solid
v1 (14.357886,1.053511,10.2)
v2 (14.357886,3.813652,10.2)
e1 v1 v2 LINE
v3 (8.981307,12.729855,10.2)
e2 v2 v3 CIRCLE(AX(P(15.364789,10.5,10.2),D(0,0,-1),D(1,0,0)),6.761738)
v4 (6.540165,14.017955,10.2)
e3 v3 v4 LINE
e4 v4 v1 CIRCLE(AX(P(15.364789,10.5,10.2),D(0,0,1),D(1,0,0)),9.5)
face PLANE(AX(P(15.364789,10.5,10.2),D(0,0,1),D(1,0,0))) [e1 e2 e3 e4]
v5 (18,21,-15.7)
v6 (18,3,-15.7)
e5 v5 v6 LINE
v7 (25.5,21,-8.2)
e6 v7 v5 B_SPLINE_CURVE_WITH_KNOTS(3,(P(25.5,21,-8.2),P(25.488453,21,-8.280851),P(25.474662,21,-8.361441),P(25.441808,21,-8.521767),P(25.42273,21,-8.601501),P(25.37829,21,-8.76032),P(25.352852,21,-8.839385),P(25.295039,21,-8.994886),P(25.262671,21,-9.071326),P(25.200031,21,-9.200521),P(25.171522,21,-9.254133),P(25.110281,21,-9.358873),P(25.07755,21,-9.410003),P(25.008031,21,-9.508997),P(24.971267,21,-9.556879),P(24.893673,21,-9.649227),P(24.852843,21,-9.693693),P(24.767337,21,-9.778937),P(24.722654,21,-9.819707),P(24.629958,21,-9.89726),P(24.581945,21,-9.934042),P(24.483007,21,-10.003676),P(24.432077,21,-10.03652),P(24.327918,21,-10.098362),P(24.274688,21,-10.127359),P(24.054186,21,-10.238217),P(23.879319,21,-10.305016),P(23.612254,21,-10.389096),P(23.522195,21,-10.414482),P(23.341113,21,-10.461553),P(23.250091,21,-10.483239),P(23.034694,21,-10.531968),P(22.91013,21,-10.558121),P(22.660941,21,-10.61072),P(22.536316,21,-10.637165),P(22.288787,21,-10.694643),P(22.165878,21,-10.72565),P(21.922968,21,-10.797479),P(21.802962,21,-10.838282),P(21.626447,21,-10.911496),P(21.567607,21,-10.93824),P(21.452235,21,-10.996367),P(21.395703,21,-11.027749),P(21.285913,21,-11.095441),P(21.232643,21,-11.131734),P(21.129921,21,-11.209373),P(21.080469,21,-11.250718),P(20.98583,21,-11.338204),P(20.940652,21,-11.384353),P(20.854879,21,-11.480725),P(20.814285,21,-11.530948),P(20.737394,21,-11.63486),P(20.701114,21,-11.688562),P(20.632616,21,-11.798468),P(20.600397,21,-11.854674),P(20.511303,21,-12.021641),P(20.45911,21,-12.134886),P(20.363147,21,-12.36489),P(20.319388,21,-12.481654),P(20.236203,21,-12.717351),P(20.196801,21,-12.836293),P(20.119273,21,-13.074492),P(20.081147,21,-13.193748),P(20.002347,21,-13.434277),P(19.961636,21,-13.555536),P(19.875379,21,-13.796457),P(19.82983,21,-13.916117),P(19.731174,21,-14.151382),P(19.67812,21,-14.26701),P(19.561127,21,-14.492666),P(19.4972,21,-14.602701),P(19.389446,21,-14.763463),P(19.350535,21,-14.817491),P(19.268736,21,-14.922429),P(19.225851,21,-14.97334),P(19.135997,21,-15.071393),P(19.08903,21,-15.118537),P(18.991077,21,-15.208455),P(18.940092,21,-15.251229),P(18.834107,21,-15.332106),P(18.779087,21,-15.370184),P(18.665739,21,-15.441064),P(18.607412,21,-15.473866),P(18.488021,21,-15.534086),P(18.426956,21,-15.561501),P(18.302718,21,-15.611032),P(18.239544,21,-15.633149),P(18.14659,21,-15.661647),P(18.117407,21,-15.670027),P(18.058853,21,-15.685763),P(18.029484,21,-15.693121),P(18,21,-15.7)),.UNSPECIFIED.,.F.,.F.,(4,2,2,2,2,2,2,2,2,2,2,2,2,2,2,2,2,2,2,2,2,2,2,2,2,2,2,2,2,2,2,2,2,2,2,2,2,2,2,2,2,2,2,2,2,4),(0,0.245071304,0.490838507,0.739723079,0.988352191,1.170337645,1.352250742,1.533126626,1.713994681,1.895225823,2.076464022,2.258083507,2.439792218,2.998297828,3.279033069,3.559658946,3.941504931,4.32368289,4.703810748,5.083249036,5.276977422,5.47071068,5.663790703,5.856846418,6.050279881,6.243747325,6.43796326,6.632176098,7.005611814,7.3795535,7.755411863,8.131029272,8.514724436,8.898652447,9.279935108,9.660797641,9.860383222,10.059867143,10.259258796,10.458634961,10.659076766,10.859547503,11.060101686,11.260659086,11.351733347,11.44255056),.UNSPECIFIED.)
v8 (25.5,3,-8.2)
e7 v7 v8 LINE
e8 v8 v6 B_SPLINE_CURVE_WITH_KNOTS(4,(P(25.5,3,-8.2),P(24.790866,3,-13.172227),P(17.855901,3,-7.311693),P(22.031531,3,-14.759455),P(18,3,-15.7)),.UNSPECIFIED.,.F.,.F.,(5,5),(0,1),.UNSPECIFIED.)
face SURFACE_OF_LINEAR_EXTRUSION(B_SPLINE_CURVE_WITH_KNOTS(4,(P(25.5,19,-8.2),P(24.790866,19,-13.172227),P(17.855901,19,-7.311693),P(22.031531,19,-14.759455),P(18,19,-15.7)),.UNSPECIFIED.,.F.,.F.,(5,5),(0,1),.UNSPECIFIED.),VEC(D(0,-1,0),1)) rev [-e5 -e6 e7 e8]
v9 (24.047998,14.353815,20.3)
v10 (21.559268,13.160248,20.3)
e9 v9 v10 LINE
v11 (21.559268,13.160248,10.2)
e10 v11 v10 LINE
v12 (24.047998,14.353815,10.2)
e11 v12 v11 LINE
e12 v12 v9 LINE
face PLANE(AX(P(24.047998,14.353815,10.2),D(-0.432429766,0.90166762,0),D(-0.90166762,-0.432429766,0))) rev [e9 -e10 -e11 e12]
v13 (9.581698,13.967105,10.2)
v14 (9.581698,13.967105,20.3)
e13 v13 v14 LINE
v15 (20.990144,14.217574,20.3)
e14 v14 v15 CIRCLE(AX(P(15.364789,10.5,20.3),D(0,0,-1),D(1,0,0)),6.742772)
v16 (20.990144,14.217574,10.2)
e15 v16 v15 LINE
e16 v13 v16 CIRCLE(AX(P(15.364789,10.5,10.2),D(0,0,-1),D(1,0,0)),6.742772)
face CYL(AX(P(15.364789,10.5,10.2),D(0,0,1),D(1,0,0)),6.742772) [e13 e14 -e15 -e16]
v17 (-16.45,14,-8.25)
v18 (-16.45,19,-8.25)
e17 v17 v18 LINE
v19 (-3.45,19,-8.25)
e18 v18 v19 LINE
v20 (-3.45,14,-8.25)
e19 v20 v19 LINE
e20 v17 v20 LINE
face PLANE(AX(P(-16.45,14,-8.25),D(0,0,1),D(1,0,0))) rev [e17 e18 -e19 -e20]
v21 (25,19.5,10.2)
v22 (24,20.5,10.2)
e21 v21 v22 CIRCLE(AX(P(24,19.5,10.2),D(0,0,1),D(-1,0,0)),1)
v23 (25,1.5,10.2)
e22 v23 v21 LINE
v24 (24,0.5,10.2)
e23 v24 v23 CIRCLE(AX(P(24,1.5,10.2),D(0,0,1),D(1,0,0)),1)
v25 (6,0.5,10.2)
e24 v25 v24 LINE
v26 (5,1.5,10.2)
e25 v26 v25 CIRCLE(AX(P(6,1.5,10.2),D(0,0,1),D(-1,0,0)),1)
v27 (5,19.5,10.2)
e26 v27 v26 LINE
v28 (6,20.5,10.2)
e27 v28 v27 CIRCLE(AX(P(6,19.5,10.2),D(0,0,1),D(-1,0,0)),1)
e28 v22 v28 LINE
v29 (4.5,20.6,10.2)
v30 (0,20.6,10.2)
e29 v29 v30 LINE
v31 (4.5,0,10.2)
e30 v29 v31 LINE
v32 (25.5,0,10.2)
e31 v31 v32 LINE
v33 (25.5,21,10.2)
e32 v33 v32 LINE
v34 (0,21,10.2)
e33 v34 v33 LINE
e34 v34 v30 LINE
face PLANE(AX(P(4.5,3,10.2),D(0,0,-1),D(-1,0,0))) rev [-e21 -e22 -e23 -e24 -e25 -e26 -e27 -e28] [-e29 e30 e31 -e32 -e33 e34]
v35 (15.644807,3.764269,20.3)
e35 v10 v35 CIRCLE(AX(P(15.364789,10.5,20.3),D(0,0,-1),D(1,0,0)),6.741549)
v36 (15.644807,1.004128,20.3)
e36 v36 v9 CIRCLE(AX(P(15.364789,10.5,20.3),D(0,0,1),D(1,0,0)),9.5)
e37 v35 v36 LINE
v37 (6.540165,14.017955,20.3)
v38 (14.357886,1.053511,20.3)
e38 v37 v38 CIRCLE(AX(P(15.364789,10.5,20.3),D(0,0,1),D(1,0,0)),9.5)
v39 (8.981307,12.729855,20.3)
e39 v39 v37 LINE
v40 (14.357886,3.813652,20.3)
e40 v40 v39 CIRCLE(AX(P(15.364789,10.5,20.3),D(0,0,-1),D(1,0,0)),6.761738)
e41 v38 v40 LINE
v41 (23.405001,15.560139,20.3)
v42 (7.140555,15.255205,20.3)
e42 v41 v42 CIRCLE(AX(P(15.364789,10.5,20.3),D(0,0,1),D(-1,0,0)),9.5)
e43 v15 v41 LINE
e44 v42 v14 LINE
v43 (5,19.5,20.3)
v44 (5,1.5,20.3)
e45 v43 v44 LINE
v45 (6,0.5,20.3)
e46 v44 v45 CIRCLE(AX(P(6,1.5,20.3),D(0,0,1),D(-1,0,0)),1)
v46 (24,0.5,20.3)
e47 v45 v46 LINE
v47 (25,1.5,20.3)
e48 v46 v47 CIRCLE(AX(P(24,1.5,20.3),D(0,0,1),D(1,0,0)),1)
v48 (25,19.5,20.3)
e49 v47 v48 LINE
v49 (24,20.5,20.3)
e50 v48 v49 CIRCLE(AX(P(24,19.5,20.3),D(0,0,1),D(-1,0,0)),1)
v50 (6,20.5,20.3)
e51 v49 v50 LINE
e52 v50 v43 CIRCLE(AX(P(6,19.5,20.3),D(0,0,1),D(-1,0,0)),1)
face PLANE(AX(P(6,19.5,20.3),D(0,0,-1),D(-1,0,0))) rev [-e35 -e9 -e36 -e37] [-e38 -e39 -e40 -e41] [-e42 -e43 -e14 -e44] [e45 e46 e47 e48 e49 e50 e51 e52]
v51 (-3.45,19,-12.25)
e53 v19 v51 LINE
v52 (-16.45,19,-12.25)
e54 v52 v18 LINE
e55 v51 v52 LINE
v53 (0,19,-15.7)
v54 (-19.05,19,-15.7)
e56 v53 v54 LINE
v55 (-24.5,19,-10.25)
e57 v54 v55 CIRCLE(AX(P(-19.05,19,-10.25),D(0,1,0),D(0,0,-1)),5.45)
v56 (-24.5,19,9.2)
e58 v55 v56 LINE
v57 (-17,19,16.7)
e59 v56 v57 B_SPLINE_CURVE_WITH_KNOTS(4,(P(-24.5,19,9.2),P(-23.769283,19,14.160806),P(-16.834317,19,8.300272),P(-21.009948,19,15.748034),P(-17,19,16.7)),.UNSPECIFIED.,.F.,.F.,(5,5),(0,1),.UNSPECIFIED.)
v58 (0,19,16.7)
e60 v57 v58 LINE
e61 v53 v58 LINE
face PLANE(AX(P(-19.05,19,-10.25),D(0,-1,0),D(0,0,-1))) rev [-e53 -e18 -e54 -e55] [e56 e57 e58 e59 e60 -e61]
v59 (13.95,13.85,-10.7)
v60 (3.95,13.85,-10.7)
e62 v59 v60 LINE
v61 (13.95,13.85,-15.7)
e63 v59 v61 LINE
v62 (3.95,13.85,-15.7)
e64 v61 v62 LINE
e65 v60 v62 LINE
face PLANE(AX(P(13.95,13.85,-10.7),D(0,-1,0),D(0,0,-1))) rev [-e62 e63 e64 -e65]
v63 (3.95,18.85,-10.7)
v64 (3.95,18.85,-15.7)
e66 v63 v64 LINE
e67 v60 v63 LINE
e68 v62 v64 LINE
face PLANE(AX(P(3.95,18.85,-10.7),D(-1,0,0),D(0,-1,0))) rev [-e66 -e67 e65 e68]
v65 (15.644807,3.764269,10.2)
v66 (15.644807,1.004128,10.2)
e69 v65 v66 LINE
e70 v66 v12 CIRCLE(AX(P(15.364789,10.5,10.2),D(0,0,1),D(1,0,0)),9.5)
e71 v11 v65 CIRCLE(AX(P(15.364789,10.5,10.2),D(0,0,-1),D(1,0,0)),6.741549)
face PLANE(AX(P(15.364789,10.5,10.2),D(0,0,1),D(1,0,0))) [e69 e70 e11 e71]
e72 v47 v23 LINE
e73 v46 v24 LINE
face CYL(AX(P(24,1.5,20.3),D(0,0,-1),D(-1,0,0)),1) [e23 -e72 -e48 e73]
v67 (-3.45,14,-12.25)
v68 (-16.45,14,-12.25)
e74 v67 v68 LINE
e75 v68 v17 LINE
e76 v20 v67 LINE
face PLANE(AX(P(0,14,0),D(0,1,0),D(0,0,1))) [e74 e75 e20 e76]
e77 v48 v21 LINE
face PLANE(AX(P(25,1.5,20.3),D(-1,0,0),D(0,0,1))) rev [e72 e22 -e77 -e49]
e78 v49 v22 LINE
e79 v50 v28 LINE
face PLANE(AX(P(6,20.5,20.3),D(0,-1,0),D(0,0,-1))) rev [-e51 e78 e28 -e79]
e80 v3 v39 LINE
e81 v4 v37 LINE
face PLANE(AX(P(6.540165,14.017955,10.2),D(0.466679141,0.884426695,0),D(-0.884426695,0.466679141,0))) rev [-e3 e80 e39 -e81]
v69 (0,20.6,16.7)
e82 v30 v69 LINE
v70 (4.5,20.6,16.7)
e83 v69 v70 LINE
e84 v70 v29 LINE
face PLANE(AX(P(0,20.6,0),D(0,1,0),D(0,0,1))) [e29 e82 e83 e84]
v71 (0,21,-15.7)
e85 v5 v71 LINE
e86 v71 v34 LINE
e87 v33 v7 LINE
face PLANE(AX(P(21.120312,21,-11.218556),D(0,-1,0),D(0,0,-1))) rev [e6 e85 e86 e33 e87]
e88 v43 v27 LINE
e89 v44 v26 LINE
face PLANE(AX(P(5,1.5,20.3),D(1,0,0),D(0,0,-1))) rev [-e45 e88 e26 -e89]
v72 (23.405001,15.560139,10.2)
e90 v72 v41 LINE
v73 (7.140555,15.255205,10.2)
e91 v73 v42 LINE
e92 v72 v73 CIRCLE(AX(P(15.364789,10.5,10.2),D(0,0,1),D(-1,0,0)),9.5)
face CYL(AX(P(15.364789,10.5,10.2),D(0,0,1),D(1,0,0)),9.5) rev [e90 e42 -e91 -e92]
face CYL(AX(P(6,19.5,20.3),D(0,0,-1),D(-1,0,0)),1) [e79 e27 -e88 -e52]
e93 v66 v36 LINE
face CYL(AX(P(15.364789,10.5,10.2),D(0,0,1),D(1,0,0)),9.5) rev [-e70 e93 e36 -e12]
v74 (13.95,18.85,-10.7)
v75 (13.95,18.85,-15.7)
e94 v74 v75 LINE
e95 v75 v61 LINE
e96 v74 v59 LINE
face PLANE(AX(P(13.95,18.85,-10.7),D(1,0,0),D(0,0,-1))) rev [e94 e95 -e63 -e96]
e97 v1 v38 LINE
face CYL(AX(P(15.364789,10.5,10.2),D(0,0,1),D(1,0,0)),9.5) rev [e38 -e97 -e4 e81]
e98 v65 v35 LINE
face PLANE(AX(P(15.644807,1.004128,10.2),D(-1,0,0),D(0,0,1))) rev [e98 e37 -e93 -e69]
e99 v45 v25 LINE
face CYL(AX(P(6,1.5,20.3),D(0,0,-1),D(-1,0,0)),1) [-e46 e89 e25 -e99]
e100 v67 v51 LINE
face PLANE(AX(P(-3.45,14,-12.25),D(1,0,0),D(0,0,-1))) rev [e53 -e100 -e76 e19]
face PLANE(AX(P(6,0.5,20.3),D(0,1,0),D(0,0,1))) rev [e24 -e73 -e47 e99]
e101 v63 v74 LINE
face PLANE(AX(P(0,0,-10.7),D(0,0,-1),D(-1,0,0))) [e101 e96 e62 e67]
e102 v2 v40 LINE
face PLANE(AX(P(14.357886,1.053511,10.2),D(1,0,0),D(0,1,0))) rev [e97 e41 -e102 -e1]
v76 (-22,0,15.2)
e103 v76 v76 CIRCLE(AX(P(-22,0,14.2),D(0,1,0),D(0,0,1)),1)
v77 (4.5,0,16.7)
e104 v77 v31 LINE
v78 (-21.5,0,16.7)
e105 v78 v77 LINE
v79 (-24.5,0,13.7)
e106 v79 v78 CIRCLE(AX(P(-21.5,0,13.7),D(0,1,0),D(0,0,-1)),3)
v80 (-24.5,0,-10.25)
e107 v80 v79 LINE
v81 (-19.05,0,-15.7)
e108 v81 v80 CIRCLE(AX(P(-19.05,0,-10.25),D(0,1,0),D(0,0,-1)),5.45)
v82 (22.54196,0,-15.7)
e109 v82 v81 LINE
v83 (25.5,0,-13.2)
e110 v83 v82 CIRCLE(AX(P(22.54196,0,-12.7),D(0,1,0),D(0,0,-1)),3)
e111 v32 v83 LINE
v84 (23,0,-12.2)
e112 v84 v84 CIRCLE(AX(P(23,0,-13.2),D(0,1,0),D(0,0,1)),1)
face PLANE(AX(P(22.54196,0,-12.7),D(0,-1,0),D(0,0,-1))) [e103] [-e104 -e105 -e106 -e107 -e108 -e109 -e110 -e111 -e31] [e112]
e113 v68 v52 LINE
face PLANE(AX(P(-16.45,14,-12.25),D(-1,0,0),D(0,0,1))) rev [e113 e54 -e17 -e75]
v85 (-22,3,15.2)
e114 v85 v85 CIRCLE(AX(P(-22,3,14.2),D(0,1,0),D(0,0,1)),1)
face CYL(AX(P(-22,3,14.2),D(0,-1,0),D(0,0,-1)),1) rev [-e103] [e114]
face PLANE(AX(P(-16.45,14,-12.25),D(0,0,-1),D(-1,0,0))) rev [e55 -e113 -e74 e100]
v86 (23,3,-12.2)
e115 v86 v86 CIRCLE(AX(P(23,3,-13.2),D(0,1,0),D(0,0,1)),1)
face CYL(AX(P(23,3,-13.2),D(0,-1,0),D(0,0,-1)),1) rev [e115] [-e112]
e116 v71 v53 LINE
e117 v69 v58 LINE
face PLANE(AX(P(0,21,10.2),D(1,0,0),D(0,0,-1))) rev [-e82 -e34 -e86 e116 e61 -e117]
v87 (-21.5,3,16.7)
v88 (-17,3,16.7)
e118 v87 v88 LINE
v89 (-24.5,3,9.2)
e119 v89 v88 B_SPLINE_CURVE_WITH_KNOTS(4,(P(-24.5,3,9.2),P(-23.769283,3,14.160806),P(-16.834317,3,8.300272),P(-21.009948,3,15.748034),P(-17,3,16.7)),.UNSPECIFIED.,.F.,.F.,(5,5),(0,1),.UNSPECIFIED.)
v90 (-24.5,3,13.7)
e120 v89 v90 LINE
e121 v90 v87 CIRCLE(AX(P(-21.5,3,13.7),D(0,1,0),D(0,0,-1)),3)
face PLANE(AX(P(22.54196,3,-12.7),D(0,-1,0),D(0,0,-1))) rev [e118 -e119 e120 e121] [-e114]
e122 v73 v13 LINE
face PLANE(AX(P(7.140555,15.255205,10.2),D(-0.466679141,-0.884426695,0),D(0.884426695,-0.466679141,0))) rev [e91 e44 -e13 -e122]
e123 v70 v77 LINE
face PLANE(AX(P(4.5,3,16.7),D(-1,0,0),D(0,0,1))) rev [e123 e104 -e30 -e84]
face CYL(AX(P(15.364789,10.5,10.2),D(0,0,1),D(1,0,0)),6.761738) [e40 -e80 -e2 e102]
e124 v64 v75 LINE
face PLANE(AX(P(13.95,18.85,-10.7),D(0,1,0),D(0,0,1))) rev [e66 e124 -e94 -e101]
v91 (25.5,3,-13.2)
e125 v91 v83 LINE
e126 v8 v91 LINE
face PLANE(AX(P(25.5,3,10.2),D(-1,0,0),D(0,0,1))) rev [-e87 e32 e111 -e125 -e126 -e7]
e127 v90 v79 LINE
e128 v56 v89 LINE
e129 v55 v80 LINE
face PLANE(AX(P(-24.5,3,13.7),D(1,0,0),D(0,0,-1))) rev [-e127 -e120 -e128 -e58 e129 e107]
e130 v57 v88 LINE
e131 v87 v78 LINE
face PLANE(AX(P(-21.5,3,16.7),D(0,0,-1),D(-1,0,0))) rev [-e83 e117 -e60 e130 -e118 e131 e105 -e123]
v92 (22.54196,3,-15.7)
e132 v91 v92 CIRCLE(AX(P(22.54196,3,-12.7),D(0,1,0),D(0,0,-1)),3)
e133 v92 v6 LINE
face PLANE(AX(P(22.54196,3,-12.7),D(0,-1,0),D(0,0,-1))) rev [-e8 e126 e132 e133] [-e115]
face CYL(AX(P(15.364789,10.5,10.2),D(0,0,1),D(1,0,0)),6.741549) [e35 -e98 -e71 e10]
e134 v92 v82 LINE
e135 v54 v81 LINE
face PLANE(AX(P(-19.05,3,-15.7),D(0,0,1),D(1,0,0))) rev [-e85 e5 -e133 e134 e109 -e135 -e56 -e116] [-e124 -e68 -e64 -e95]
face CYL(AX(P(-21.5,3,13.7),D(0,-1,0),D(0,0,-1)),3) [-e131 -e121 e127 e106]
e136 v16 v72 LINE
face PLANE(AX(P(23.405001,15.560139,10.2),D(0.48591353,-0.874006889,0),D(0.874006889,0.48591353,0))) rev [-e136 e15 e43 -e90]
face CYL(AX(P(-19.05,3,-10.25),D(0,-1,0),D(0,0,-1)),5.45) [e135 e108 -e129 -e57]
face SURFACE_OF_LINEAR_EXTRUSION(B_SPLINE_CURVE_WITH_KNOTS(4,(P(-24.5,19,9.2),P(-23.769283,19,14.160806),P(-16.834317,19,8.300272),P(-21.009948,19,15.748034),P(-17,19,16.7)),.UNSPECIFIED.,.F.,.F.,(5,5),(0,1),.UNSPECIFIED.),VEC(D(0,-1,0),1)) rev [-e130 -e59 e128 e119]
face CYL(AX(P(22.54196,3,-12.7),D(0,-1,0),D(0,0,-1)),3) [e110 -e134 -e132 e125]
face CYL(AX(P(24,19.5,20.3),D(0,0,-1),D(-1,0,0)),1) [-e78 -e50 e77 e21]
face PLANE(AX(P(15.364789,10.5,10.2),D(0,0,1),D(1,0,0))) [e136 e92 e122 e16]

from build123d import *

# Parameters (mm, degrees)
SKETCH1_R           = 1
BOSS_EXTRUDE1_DEPTH = 3
BOSS_EXTRUDE2_DEPTH = 16
BOSS_EXTRUDE3_DEPTH = 2
SKETCH4_W           = 4.5
SKETCH4_H           = 6.5
BOSS_EXTRUDE4_DEPTH = 1.6
BOSS_EXTRUDE5_DEPTH = 10.1
CUT_EXTRUDE1_DEPTH  = 10.1
SKETCH8_W           = 13
SKETCH8_H           = 4
CUT_EXTRUDE2_DEPTH  = 5
SKETCH9_W           = 10
SKETCH9_H           = 5
CUT_EXTRUDE3_DEPTH  = 5


# Read off the part's stored shape, not the designer's step: Boss-Extrude2
with BuildPart() as part:
    # Sketch1 → Boss-Extrude1 (new body)
    with BuildSketch(Plane(origin=(0, 0, 0), x_dir=(1, 0, 0), z_dir=(0, 1, 0))):
        with BuildLine():
            Line((4.5, -16.7), (4.5, -10.2))
            Line((4.5, -10.2), (25.5, -10.2))
            Line((25.5, -10.2), (25.5, 13.2))
            ThreePointArc((25.5, 13.2), (24.478451782, 14.991287847), (22.541960108, 15.7))
            Line((22.541960108, 15.7), (-19.05, 15.7))
            ThreePointArc((-19.05, 15.7), (-22.903731957, 14.103731957), (-24.5, 10.25))
            Line((-24.5, 10.25), (-24.5, -13.7))
            ThreePointArc((-24.5, -13.7), (-23.621320344, -15.821320344), (-21.5, -16.7))
            Line((-21.5, -16.7), (4.5, -16.7))
        make_face()
        with Locations(Location((23, 13.2, 0), (0, 0, 270))):
            Circle(SKETCH1_R, mode=Mode.SUBTRACT)
        with Locations(Location((-22, -14.2, 0), (0, 0, 270))):
            Circle(SKETCH1_R, mode=Mode.SUBTRACT)
    extrude(amount=BOSS_EXTRUDE1_DEPTH)

    # Boss-Extrude2 outline → Boss-Extrude2 (add)
    with BuildSketch(Plane(origin=(0, 3, 0), x_dir=(1, 0, 0), z_dir=(0, 1, 0))):
        with BuildLine():
            Line((-24.5, 10.25), (-24.5, -9.2))
            add(Edge.make_bspline(
                [(-24.5, -9.2), (-23.769282577, -14.160806345), (-16.834317029, -8.300272079), (-21.009947693, -15.748034375), (-17, -16.7)],
                knots=[0, 0, 0, 0, 0, 1, 1, 1, 1, 1], degree=4))
            Line((-17, -16.7), (4.5, -16.7))
            Line((4.5, -16.7), (4.5, -10.2))
            Line((4.5, -10.2), (25.5, -10.2))
            Line((25.5, -10.2), (25.5, 8.2))
            add(Edge.make_bspline(
                [(25.5, 8.2), (24.79086606, 13.172227374), (17.855900512, 7.311693108), (22.031531177, 14.759455405), (18, 15.7)],
                knots=[0, 0, 0, 0, 0, 1, 1, 1, 1, 1], degree=4))
            Line((18, 15.7), (-19.05, 15.7))
            ThreePointArc((-19.05, 15.7), (-22.903731957, 14.103731957), (-24.5, 10.25))
        make_face()
    extrude(amount=BOSS_EXTRUDE2_DEPTH)

    # Sketch3 → Boss-Extrude3 (add)
    with BuildSketch(Plane(origin=(0, 19, 0), x_dir=(1, 0, 0), z_dir=(0, 1, 0))):
        with BuildLine():
            Line((25.5, -10.2), (25.5, 8.2))
            add(Edge.make_bspline(
                [(25.5, 8.2), (24.79086606, 13.172227374), (17.855900512, 7.311693108), (22.031531177, 14.759455405), (18, 15.7)],
                knots=[0, 0, 0, 0, 0, 1, 1, 1, 1, 1], degree=4))
            Line((18, 15.7), (0, 15.7))
            Line((0, 15.7), (0, -10.2))
            Line((0, -10.2), (25.5, -10.2))
        make_face()
    extrude(amount=BOSS_EXTRUDE3_DEPTH)

    # Sketch4 → Boss-Extrude4 (add)
    with BuildSketch(Plane(origin=(0, 19, 0), x_dir=(1, 0, 0), z_dir=(0, 1, 0))):
        with Locations((2.25, -13.45)):
            Rectangle(SKETCH4_W, SKETCH4_H)
    extrude(amount=BOSS_EXTRUDE4_DEPTH)

    # Sketch5 → Boss-Extrude5 (add)
    with BuildSketch(Plane.XY.offset(10.2)):
        with BuildLine():
            Line((6, 0.5), (24, 0.5))
            ThreePointArc((24, 0.5), (24.707106781, 0.792893219), (25, 1.5))
            Line((25, 1.5), (25, 19.5))
            ThreePointArc((25, 19.5), (24.707106781, 20.207106781), (24, 20.5))
            Line((24, 20.5), (6, 20.5))
            ThreePointArc((6, 20.5), (5.292893219, 20.207106781), (5, 19.5))
            Line((5, 19.5), (5, 1.5))
            ThreePointArc((5, 1.5), (5.292893219, 0.792893219), (6, 0.5))
        make_face()
    extrude(amount=BOSS_EXTRUDE5_DEPTH)

    # Sketch7 → Cut-Extrude1 (cut)
    with BuildSketch(Plane.XY.offset(20.3)):
        with BuildLine():
            Line((14.357886119, 1.053511456), (14.357886119, 3.813652456))
            ThreePointArc((14.357886119, 3.813652456), (9.574356132, 7.008298347), (8.98130736, 12.729855361))
            Line((8.98130736, 12.729855361), (6.540165326, 14.017955408))
            ThreePointArc((6.540165326, 14.017955408), (7.229438492, 5.594282327), (14.357886119, 1.053511456))
        make_face()
        with BuildLine():
            Line((7.140555489, 15.255205238), (9.581697527, 13.967105189))
            ThreePointArc((9.581697527, 13.967105189), (15.216789935, 17.241147229), (20.990144219, 14.217573506))
            Line((20.990144219, 14.217573506), (23.405000511, 15.560138833))
            ThreePointArc((23.405000511, 15.560138833), (15.186710134, 19.998330789), (7.140555489, 15.255205238))
        make_face()
        with BuildLine():
            Line((24.047997852, 14.353815082), (21.559268085, 13.160247955))
            ThreePointArc((21.559268085, 13.160247955), (21.07012739, 6.908676596), (15.644806916, 3.764268729))
            Line((15.644806916, 3.764268729), (15.644806916, 1.004127729))
            ThreePointArc((15.644806916, 1.004127729), (23.404589952, 5.439208876), (24.047997852, 14.353815082))
        make_face()
    extrude(amount=-CUT_EXTRUDE1_DEPTH, mode=Mode.SUBTRACT)

    # Sketch8 → Cut-Extrude2 (cut)
    with BuildSketch(Plane(origin=(0, 19, 0), x_dir=(1, 0, 0), z_dir=(0, 1, 0))):
        with Locations((-9.95, 10.25)):
            Rectangle(SKETCH8_W, SKETCH8_H)
    extrude(amount=-CUT_EXTRUDE2_DEPTH, mode=Mode.SUBTRACT)

    # Sketch9 → Cut-Extrude3 (cut)
    with BuildSketch(Plane(origin=(0, 0, -15.7), x_dir=(-1, 0, 0), z_dir=(0, 0, -1))):
        with Locations((-8.95, 16.35)):
            Rectangle(SKETCH9_W, SKETCH9_H)
    extrude(amount=-CUT_EXTRUDE3_DEPTH, mode=Mode.SUBTRACT)


solid = part.part
